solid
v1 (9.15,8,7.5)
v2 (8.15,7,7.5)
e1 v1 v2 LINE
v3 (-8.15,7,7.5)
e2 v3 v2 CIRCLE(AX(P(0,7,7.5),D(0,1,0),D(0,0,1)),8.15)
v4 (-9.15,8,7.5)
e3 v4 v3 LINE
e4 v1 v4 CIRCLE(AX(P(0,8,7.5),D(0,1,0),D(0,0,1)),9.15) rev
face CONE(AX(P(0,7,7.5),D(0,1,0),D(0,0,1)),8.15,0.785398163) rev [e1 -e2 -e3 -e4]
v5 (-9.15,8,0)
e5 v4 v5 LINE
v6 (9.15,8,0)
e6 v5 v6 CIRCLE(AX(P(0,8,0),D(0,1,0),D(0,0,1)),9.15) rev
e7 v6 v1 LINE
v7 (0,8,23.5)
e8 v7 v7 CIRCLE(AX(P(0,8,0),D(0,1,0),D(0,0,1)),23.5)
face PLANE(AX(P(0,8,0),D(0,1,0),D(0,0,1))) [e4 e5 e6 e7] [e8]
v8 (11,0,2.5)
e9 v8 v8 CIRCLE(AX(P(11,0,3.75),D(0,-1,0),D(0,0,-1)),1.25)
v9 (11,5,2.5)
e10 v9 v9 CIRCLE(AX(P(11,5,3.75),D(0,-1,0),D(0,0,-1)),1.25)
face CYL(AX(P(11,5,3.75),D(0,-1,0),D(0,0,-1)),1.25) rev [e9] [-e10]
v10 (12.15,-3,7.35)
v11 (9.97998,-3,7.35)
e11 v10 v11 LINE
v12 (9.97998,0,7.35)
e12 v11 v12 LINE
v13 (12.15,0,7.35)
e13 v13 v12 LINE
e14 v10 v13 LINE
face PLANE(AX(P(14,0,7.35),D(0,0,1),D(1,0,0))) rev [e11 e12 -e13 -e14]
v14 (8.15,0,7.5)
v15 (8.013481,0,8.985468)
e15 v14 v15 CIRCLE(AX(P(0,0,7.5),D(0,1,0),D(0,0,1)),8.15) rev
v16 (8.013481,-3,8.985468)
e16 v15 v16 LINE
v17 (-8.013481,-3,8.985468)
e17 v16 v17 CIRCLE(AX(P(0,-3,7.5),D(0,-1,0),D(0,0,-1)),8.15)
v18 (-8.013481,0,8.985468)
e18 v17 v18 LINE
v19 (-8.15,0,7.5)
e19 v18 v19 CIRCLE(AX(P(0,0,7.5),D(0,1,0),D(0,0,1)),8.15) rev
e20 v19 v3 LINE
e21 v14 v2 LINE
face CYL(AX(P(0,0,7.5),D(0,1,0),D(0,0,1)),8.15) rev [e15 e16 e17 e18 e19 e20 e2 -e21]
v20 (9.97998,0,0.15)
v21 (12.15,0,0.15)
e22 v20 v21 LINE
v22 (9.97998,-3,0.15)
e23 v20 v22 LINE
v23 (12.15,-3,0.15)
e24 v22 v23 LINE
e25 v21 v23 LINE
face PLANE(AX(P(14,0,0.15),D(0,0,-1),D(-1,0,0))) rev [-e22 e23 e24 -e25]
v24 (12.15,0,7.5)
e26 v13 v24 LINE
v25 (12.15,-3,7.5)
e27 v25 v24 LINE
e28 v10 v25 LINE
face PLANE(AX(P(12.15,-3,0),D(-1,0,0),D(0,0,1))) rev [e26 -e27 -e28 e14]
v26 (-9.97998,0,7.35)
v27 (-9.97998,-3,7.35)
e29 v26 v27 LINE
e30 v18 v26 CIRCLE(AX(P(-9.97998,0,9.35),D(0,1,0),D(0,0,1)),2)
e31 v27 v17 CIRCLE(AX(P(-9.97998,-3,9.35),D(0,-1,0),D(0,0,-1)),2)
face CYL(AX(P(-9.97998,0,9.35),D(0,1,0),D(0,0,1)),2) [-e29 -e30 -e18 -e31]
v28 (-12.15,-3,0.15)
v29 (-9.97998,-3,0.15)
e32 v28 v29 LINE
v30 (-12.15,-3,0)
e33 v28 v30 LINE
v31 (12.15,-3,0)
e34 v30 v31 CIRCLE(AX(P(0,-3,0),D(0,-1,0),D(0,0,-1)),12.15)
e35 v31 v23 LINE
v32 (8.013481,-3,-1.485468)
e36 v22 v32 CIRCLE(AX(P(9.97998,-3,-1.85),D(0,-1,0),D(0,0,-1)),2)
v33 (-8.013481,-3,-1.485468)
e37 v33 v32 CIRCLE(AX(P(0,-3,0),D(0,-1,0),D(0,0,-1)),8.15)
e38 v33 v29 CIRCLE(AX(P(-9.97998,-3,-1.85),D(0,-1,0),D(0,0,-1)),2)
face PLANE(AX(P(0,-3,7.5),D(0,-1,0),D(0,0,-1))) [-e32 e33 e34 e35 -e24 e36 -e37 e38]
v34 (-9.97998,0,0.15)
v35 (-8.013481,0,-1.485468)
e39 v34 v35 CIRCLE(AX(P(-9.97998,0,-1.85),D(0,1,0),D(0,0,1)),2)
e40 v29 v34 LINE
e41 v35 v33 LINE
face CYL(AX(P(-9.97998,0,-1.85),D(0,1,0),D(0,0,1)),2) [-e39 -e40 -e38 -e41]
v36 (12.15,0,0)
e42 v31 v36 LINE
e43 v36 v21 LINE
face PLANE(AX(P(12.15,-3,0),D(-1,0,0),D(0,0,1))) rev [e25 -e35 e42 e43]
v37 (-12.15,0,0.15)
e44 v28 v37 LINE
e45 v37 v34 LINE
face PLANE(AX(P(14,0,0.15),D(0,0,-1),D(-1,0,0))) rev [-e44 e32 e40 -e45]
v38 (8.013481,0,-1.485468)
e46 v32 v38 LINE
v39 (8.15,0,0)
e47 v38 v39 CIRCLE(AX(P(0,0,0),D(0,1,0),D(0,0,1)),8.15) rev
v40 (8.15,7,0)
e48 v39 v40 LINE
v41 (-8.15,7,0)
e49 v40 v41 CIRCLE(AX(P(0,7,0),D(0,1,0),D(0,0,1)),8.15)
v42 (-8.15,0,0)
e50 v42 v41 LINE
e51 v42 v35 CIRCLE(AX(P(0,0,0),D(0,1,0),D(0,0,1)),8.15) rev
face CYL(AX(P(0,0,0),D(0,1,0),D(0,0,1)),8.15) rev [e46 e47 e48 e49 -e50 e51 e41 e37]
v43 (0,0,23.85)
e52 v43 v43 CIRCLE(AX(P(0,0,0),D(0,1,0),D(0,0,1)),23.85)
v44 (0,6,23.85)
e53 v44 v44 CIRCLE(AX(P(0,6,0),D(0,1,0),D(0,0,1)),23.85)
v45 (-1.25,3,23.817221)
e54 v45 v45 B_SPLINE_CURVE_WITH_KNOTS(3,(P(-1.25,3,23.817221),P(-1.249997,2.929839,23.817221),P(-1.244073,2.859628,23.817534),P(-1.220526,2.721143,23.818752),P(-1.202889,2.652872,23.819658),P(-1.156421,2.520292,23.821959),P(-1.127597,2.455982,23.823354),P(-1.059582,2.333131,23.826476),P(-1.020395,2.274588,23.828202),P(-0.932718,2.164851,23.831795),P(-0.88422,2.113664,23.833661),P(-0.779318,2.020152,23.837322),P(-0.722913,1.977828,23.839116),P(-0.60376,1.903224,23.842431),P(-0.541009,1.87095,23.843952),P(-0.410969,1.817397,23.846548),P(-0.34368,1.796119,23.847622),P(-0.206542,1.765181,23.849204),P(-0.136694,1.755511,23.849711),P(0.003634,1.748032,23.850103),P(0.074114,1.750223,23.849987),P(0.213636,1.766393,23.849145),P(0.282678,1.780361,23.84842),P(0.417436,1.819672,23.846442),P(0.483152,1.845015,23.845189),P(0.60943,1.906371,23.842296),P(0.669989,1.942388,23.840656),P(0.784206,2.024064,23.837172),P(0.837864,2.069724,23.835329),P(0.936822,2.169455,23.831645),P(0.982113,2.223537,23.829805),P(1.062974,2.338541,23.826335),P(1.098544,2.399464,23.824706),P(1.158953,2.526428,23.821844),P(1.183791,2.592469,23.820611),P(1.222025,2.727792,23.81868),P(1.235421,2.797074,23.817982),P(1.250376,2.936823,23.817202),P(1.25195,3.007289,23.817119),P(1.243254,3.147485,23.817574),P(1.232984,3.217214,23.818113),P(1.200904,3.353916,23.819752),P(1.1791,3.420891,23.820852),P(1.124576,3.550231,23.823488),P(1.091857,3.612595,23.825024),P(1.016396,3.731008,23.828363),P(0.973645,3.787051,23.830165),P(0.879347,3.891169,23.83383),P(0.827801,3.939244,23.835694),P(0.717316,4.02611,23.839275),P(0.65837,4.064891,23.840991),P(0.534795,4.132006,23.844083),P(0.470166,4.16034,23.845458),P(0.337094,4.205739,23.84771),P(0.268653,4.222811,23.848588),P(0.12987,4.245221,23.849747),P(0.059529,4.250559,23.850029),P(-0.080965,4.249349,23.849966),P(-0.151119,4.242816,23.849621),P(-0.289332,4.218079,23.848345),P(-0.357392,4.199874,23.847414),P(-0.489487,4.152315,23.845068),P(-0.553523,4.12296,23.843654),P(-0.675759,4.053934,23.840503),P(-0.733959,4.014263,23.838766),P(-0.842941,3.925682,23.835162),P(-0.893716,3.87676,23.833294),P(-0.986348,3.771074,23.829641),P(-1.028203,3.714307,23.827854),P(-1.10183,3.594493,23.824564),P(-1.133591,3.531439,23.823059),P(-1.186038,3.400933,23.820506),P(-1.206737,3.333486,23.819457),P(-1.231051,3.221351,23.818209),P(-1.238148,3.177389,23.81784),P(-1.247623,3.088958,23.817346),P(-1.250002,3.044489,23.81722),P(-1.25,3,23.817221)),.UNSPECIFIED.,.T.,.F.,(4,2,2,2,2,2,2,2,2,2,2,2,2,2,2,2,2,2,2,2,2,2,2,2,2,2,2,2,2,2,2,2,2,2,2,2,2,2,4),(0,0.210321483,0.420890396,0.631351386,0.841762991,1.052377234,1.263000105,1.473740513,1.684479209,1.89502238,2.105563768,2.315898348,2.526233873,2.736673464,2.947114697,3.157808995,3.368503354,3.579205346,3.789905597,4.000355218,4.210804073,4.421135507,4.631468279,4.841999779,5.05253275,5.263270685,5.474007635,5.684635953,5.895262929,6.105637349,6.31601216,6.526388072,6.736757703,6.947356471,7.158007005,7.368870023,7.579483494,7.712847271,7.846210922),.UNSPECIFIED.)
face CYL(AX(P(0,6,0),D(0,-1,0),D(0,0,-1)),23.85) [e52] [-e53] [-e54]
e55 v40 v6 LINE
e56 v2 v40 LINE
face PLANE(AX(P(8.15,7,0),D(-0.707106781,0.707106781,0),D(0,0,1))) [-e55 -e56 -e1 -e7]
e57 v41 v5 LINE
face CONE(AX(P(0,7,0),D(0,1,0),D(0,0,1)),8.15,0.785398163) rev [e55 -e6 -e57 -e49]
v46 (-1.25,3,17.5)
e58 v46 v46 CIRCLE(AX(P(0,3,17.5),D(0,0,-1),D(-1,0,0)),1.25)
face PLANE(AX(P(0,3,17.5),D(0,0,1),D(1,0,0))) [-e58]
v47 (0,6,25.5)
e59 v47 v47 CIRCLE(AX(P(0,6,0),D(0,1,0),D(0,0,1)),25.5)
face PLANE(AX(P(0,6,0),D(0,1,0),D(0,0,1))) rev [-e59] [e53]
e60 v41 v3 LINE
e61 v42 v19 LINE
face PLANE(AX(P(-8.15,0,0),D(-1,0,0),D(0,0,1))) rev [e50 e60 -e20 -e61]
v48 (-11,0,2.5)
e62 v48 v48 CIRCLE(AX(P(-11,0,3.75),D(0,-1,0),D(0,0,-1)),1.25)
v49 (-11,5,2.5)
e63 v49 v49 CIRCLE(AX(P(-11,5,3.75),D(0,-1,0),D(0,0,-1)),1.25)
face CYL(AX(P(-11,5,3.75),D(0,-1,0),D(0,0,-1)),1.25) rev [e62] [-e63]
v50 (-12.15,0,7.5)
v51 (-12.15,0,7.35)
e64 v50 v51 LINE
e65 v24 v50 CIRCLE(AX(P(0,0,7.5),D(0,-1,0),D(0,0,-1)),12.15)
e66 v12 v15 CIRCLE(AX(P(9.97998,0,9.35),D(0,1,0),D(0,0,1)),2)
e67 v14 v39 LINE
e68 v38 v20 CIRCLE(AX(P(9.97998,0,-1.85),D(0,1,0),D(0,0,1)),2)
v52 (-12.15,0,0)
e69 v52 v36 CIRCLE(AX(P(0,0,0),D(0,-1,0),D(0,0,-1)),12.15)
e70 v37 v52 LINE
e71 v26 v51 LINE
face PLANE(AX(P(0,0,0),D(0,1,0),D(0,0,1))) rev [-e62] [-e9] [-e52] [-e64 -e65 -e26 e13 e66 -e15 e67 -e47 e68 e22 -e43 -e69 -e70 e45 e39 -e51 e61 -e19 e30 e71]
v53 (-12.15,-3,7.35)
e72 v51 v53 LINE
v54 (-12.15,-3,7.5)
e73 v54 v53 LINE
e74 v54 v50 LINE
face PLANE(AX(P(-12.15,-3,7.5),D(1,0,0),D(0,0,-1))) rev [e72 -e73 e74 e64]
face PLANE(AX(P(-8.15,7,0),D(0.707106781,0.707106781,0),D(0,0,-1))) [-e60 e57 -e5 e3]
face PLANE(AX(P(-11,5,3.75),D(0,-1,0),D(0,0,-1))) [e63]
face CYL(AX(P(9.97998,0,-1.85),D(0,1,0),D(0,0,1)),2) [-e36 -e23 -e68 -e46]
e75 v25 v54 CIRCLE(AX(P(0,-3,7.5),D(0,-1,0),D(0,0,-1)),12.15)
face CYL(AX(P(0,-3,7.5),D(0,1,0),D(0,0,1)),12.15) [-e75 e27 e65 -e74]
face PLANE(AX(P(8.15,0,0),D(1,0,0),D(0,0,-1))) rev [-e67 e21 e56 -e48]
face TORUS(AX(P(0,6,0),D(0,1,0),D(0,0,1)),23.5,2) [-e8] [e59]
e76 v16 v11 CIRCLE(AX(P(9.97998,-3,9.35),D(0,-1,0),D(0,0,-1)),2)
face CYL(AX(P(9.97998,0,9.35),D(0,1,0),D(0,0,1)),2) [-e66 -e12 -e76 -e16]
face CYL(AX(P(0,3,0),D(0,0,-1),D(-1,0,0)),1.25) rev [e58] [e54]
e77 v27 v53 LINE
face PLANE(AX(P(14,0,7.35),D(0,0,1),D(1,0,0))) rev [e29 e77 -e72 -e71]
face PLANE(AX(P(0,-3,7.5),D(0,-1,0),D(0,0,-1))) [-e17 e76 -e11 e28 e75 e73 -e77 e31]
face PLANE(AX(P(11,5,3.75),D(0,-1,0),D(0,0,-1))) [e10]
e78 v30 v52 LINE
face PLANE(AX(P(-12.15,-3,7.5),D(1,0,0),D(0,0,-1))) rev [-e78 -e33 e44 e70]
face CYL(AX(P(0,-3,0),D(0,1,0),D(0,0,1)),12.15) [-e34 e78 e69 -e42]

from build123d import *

# Parameters (mm, degrees)
SKETCH1_R           = 23.85
BOSS_EXTRUDE1_DEPTH = 6
SKETCH2_R           = 25.5
BOSS_EXTRUDE2_DEPTH = 2
FILLET1_R           = 2
CUT_EXTRUDE1_DEPTH  = 37.939139135
BOSS_EXTRUDE3_DEPTH = 3
SKETCH5_W           = 28
SKETCH5_H           = 7.2
CUT_EXTRUDE2_DEPTH  = 3
SKETCH6_R           = 1.25
CUT_EXTRUDE3_DEPTH  = 5
FILLET2_R           = 2
CHAMFER1_SIZE       = 1
SKETCH7_W           = 1.25
SKETCH7_H           = 8


# Some blends are built 0.0001 mm under size
with BuildPart() as part:
    # Sketch1 → Boss-Extrude1 (new body)
    with BuildSketch(Plane(origin=(0, 0, 0), x_dir=(1, 0, 0), z_dir=(0, 1, 0))):
        with Locations(Location((0, 0, 0), (0, 0, 270))):
            Circle(SKETCH1_R)
    extrude(amount=BOSS_EXTRUDE1_DEPTH)

    # Sketch2 → Boss-Extrude2 (add)
    with BuildSketch(Plane(origin=(0, 6, 0), x_dir=(1, 0, 0), z_dir=(0, 1, 0))):
        with Locations(Location((0, 0, 0), (0, 0, 270))):
            Circle(SKETCH2_R)
    extrude(amount=BOSS_EXTRUDE2_DEPTH)

    # Fillet1
    fillet1_edges = [part.edges().sort_by_distance(p)[0] for p in [
        (0, 8, -25.5),
    ]]
    fillet(fillet1_edges, radius=FILLET1_R - 0.0001)  # a hair under: the kernel refuses the full size

    # Sketch3 → Cut-Extrude1 (cut, through all)
    with BuildSketch(Plane(origin=(0, 8, 0), x_dir=(1, 0, 0), z_dir=(0, 1, 0))):
        with BuildLine():
            Line((8.15, 0), (8.15, -7.5))
            ThreePointArc((8.15, -7.5), (0, -15.65), (-8.15, -7.5))
            Line((-8.15, -7.5), (-8.15, 0))
            ThreePointArc((-8.15, 0), (0, 8.15), (8.15, 0))
        make_face()
    extrude(amount=-CUT_EXTRUDE1_DEPTH, mode=Mode.SUBTRACT)

    # Sketch4 → Boss-Extrude3 (add)
    with BuildSketch(Plane.XZ):
        with BuildLine():
            Line((-12.15, 7.5), (-12.15, 0))
            ThreePointArc((-12.15, 0), (0, -12.15), (12.15, 0))
            Line((12.15, 0), (12.15, 7.5))
            ThreePointArc((12.15, 7.5), (0, 19.65), (-12.15, 7.5))
        make_face()
        with BuildLine():
            Line((8.15, 0), (8.15, 7.5))
            ThreePointArc((8.15, 7.5), (0, 15.65), (-8.15, 7.5))
            Line((-8.15, 7.5), (-8.15, 0))
            ThreePointArc((-8.15, 0), (0, -8.15), (8.15, 0))
        make_face(mode=Mode.SUBTRACT)
    extrude(amount=BOSS_EXTRUDE3_DEPTH)

    # Sketch5 → Cut-Extrude2 (cut)
    with BuildSketch(Plane.XZ.offset(3)):
        with Locations((0, 3.75)):
            Rectangle(SKETCH5_W, SKETCH5_H)
    extrude(amount=-CUT_EXTRUDE2_DEPTH, mode=Mode.SUBTRACT)

    # Sketch6 → Cut-Extrude3 (cut)
    with BuildSketch(Plane.XZ):
        with Locations(Location((-11, 3.75, 0), (0, 0, 270))):
            Circle(SKETCH6_R)
        with Locations(Location((11, 3.75, 0), (0, 0, 270))):
            Circle(SKETCH6_R)
    extrude(amount=-CUT_EXTRUDE3_DEPTH, mode=Mode.SUBTRACT)

    # Fillet2
    # the kernel refuses this fillet: 2 mm, written as the material it takes off along each edge
    with BuildSketch(Plane(origin=(8.15, -7.5749499, 0.15), x_dir=(-0.08318438898072168, 0, -0.9965341727356388), z_dir=(0, 1, 0)), Plane(origin=(8.15, 0, 7.35), x_dir=(-0.08318438898072168, 0, 0.9965341727356388), z_dir=(0, -1, 0)), Plane(origin=(-8.15, 0, 0.15), x_dir=(0.08318438898072168, 0, -0.9965341727356388), z_dir=(0, -1, 0)), Plane(origin=(-8.15, -7.5749499, 7.35), x_dir=(0.08318438898072159, 0, 0.9965341727356388), z_dir=(0, 1, 0))) as fillet2_piece_1:
        with BuildLine():
            CenterArc((1.840842581, -1.990006343), FILLET2_R, 95.730148145, 79.498223624)
            Line((-0.152225765, -1.823637565), (-0.351532599, -1.807000688))
            Line((-0.351532599, -1.807000688), (-0.199306835, 0.016636878))
            Line((-0.199306835, 0.016636878), (0.016636878, 0.199306835))
            ThreePointArc((0.016636878, 0.199306835), (0.166117004, 0.186829176), (1.62118728, 0.199000634))
            Line((1.62118728, 0.199000634), (1.641155943, 0))
        make_face()
    extrude(amount=7.5749499, mode=Mode.SUBTRACT)

    # Chamfer1
    chamfer1_edges = [part.edges().sort_by_distance(p)[0] for p in [
        (0, 8, -8.15),
        (-8.15, 8, 3.75),
        (0, 8, 15.65),
        (8.15, 8, 3.75),
    ]]
    chamfer(chamfer1_edges, length=CHAMFER1_SIZE)

    # Sketch7 → Cut-Revolve1 (revolve, cut)
    with BuildSketch(Plane(origin=(0, 3, 0), x_dir=(-1, 0, 0), z_dir=(0, -1, 0))):
        with Locations((0.625, -21.5)):
            Rectangle(SKETCH7_W, SKETCH7_H)
    revolve(axis=Axis((0, 3, 0), (0, 0, 1)), mode=Mode.SUBTRACT)


solid = part.part
